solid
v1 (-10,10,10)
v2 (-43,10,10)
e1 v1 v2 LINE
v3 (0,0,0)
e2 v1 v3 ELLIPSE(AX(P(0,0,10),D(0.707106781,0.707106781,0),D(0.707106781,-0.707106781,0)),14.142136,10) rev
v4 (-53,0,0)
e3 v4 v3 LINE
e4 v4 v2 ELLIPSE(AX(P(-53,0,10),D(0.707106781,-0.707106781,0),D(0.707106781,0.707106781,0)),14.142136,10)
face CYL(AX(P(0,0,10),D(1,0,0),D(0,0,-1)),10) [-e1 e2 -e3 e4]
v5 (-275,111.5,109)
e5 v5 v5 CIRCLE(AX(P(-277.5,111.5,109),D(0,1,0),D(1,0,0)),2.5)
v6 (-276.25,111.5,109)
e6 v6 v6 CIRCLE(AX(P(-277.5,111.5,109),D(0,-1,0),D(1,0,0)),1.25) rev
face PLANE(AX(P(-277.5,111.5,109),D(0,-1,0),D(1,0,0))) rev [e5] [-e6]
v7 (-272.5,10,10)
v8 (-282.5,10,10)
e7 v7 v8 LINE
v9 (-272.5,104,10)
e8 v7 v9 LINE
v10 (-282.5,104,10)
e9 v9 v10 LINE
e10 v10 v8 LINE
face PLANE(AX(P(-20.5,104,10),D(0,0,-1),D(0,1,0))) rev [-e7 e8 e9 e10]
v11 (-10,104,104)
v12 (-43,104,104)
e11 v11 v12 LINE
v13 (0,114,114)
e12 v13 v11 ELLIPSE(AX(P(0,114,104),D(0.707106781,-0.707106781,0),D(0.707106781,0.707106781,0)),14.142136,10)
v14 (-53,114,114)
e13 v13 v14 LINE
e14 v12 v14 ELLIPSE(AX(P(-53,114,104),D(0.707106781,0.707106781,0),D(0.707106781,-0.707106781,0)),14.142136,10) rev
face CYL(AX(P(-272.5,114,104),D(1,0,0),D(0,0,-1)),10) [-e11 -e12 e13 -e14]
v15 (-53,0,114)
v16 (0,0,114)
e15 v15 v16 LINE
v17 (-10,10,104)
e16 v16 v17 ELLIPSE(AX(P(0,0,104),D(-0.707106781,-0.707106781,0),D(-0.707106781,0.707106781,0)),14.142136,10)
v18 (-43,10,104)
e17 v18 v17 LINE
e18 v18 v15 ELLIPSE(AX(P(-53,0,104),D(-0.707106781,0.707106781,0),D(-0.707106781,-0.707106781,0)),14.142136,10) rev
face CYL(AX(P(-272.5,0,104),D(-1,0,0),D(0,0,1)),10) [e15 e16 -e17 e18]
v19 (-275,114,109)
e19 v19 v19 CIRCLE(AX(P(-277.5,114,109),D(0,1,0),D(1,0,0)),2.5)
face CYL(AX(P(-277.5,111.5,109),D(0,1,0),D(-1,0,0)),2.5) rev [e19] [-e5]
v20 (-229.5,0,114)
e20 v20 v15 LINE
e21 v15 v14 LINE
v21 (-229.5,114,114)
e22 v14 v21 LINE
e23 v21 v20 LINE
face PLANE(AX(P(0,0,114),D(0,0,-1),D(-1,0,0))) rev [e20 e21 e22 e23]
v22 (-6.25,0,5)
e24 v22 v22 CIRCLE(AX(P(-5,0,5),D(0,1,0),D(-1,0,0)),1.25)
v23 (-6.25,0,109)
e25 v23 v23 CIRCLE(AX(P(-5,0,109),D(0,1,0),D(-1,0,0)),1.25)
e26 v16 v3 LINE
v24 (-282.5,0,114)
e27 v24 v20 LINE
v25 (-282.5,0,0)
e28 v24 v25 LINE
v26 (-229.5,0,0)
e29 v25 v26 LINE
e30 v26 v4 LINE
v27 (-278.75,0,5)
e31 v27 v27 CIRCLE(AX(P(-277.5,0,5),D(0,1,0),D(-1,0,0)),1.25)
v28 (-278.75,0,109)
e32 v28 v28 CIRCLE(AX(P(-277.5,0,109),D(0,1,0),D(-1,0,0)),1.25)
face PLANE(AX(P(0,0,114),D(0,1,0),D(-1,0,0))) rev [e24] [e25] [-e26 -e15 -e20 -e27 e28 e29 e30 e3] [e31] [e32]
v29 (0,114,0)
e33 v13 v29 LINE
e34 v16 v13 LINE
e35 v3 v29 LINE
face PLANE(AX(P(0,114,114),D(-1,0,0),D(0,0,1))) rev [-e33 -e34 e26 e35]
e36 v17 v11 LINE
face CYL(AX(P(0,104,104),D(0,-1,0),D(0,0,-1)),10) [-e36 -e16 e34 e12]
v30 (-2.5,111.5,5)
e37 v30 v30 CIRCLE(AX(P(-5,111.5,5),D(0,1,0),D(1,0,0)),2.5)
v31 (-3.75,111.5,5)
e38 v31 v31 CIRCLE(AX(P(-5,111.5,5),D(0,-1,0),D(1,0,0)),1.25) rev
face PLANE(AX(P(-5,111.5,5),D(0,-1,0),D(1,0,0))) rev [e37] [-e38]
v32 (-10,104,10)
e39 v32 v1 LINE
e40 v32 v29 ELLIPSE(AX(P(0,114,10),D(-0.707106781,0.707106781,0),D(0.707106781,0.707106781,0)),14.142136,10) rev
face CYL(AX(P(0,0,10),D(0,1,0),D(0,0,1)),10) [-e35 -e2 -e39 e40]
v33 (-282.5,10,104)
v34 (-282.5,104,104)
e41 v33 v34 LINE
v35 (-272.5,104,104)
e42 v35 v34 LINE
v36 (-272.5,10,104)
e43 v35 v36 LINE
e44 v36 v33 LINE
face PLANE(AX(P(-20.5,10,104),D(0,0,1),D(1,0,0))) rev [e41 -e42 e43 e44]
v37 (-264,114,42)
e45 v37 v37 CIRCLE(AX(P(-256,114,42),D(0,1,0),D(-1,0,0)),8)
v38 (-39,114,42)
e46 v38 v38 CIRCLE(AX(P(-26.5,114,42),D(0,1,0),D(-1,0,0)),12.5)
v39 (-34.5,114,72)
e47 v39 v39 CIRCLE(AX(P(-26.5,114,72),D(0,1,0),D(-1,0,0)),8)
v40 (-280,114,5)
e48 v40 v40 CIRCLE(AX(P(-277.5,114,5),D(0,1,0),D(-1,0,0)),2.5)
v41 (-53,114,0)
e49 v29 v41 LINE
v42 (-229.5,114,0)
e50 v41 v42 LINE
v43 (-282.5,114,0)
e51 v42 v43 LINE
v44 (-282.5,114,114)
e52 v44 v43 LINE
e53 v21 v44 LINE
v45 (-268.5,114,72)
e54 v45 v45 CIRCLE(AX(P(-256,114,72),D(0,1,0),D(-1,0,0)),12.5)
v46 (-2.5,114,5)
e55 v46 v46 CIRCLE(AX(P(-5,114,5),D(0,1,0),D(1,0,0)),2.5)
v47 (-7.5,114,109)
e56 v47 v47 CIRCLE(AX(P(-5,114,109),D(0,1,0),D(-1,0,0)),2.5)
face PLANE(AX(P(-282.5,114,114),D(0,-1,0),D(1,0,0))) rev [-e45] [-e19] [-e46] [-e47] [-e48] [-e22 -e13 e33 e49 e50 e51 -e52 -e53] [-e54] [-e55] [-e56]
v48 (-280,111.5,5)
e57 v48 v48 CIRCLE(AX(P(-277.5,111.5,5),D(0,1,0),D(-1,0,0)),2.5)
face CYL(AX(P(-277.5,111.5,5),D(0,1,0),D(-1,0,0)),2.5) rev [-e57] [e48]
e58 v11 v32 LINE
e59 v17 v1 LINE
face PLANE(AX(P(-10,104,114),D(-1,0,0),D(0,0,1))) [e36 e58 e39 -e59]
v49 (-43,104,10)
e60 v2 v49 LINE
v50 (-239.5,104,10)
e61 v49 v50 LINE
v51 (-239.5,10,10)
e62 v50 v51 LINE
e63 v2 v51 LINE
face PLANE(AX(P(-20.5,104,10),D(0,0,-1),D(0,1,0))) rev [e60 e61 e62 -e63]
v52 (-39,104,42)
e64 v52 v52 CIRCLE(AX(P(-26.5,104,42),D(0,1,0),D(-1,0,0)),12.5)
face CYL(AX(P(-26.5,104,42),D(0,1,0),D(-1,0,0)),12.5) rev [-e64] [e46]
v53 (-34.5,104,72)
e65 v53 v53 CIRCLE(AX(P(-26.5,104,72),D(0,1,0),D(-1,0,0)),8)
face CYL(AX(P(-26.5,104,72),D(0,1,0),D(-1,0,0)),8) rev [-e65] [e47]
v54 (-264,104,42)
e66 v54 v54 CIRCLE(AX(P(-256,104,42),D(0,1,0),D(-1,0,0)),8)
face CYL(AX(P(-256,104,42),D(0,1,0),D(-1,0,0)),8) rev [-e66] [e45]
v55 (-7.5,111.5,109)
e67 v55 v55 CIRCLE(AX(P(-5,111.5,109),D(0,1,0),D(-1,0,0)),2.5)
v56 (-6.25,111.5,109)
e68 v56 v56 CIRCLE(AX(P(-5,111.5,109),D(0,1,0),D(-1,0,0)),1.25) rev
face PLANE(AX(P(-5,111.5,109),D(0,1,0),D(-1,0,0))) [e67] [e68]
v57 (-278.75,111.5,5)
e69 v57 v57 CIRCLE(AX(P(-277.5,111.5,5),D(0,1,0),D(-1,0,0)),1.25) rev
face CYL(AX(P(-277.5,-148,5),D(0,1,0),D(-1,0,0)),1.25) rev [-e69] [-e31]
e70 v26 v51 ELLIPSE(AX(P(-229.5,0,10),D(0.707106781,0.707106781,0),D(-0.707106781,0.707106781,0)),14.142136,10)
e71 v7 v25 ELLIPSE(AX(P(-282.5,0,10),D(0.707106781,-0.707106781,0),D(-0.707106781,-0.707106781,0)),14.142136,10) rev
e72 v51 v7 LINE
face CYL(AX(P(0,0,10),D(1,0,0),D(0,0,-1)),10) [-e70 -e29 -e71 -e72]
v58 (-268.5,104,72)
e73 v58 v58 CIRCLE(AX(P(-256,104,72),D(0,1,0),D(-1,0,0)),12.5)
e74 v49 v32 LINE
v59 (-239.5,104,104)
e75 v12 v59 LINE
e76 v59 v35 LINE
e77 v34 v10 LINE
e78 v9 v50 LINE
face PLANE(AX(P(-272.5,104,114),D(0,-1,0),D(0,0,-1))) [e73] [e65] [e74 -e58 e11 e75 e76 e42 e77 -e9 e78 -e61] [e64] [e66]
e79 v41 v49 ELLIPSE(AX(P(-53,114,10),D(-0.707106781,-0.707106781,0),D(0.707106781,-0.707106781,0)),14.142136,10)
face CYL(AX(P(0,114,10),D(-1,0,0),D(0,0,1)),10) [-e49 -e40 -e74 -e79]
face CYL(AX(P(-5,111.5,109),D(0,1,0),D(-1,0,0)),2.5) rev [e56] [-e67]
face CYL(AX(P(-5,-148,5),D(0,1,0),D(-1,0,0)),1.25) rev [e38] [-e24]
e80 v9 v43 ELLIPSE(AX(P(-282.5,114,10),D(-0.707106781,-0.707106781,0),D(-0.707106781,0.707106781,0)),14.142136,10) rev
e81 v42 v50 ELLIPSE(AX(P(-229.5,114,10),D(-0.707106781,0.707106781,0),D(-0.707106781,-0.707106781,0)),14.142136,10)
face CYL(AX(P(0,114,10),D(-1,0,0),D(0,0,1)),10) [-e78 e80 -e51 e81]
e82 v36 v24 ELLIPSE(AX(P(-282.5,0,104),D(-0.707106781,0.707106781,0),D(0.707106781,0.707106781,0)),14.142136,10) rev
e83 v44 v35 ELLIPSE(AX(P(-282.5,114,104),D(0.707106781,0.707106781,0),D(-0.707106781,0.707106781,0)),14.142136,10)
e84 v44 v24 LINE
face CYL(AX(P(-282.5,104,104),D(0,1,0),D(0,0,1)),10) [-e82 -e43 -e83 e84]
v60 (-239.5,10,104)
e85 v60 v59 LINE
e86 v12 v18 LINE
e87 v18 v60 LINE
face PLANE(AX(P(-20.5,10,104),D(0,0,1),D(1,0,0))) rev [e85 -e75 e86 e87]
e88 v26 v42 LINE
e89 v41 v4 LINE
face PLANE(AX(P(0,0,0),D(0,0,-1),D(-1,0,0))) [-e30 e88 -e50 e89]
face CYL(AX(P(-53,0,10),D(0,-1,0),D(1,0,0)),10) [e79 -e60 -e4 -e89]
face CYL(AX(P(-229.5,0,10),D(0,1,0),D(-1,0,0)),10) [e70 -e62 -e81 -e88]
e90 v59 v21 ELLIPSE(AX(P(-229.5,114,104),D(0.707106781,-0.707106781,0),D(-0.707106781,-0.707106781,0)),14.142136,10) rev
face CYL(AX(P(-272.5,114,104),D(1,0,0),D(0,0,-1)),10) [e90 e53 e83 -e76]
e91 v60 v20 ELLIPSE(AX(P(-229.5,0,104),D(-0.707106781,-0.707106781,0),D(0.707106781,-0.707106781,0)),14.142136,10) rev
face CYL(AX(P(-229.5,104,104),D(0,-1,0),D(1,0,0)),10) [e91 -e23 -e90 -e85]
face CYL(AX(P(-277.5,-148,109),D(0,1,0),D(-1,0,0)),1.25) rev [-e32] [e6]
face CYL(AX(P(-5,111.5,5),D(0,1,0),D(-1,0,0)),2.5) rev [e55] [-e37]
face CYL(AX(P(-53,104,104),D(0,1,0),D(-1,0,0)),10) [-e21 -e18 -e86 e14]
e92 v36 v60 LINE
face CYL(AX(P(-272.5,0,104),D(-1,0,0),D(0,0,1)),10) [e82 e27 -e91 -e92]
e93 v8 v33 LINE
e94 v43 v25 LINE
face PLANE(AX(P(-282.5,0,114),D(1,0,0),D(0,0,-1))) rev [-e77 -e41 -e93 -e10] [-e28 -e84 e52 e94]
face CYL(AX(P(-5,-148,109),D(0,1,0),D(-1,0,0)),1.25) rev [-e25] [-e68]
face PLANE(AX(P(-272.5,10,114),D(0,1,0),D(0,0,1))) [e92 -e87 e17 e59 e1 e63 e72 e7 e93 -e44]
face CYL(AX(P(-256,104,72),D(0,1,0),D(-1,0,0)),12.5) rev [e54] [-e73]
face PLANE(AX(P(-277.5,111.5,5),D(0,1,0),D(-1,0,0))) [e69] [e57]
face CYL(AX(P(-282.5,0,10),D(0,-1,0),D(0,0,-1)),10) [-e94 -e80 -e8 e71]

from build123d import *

# Parameters (mm, degrees)
SKETCH1_W           = 282.5
SKETCH1_H           = 114
BOSS_EXTRUDE1_DEPTH = 114
SKETCH5_W           = 33
SKETCH5_H           = 94
CUT_EXTRUDE3_DEPTH  = 326.266429255
SKETCH6_W           = 94
SKETCH6_H           = 94
CUT_EXTRUDE4_DEPTH  = 262
SKETCH7_R           = 1.25
CUT_EXTRUDE5_DEPTH  = 262
SKETCH8_R           = 2.5
CUT_EXTRUDE6_DEPTH  = 2.5
FILLET3_R           = 10
FILLET4_R           = 10
FILLET6_R           = 10
SKETCH11_R          = 8
SKETCH11_R_2        = 12.5
CUT_EXTRUDE7_DEPTH  = 10


with BuildPart() as part:
    # Sketch1 → Boss-Extrude1 (new body)
    with BuildSketch(Plane.XY):
        with Locations((-141.25, 57)):
            Rectangle(SKETCH1_W, SKETCH1_H)
    extrude(amount=BOSS_EXTRUDE1_DEPTH)

    # Sketch5 → Cut-Extrude3 (cut, through all)
    with BuildSketch(Plane.XY):
        with Locations((-256, 57)):
            Rectangle(SKETCH5_W, SKETCH5_H)
        with Locations((-26.5, 57)):
            Rectangle(SKETCH5_W, SKETCH5_H)
    extrude(amount=CUT_EXTRUDE3_DEPTH, mode=Mode.SUBTRACT)

    # Sketch6 → Cut-Extrude4 (cut)
    with BuildSketch(Plane.ZY.offset(282.5)):
        with Locations((57, 57)):
            Rectangle(SKETCH6_W, SKETCH6_H)
    extrude(amount=-CUT_EXTRUDE4_DEPTH, mode=Mode.SUBTRACT)

    # Sketch7 → Cut-Extrude5 (cut)
    with BuildSketch(Plane(origin=(0, 114, 0), x_dir=(1, 0, 0), z_dir=(0, 1, 0))):
        with Locations(Location((-277.5, -109, 0), (0, 0, 180))):
            Circle(SKETCH7_R)
        with Locations(Location((-277.5, -5, 0), (0, 0, 180))):
            Circle(SKETCH7_R)
        with Locations(Location((-5, -109, 0), (0, 0, 180))):
            Circle(SKETCH7_R)
        with Locations(Location((-5, -5, 0), (0, 0, 180))):
            Circle(SKETCH7_R)
    extrude(amount=-CUT_EXTRUDE5_DEPTH, mode=Mode.SUBTRACT)

    # Sketch8 → Cut-Extrude6 (cut)
    with BuildSketch(Plane(origin=(0, 114, 0), x_dir=(1, 0, 0), z_dir=(0, 1, 0))):
        with Locations(Location((-277.5, -5, 0), (0, 0, 180))):
            Circle(SKETCH8_R)
        with Locations((-277.5, -109)):
            Circle(SKETCH8_R)
        with Locations((-5, -5)):
            Circle(SKETCH8_R)
        with Locations(Location((-5, -109, 0), (0, 0, 180))):
            Circle(SKETCH8_R)
    extrude(amount=-CUT_EXTRUDE6_DEPTH, mode=Mode.SUBTRACT)

    # Fillet3
    fillet3_edges = [part.edges().sort_by_distance(p)[0] for p in [
        (-256, 104, 114),
    ]]
    fillet(fillet3_edges, radius=FILLET3_R - 0.0001)  # a hair under: the kernel refuses the full size

    # Fillet4
    fillet4_edges = [part.edges().sort_by_distance(p)[0] for p in [
        (-239.5, 61.99995, 114),
        (-272.5, 61.99995, 114),
        (-256, 10, 114),
    ]]
    fillet(fillet4_edges, radius=FILLET4_R - 0.0001)  # a hair under: the kernel refuses the full size

    # Fillet6
    fillet6_edges = [part.edges().sort_by_distance(p)[0] for p in [
        (-256, 104, 0),
        (-239.5, 57, 0),
        (-272.5, 57, 0),
        (-256, 10, 0),
        (-26.5, 10, 0),
        (-10, 57, 0),
        (-43, 57, 0),
        (-26.5, 104, 0),
        (-26.5, 10, 114),
        (-26.5, 104, 114),
        (-10, 57, 114),
        (-43, 57, 114),
    ]]
    fillet(fillet6_edges, radius=FILLET6_R - 0.0001)  # a hair under: the kernel refuses the full size

    # Sketch11 → Cut-Extrude7 (cut)
    with BuildSketch(Plane(origin=(0, 114, 0), x_dir=(1, 0, 0), z_dir=(0, 1, 0))):
        with Locations(Location((-256, -42, 0), (0, 0, 180))):
            Circle(SKETCH11_R)
        with Locations(Location((-256, -72, 0), (0, 0, 180))):
            Circle(SKETCH11_R_2)
        with Locations(Location((-26.5, -42, 0), (0, 0, 180))):
            Circle(SKETCH11_R_2)
        with Locations(Location((-26.5, -72, 0), (0, 0, 180))):
            Circle(SKETCH11_R)
    extrude(amount=-CUT_EXTRUDE7_DEPTH, mode=Mode.SUBTRACT)


solid = part.part
